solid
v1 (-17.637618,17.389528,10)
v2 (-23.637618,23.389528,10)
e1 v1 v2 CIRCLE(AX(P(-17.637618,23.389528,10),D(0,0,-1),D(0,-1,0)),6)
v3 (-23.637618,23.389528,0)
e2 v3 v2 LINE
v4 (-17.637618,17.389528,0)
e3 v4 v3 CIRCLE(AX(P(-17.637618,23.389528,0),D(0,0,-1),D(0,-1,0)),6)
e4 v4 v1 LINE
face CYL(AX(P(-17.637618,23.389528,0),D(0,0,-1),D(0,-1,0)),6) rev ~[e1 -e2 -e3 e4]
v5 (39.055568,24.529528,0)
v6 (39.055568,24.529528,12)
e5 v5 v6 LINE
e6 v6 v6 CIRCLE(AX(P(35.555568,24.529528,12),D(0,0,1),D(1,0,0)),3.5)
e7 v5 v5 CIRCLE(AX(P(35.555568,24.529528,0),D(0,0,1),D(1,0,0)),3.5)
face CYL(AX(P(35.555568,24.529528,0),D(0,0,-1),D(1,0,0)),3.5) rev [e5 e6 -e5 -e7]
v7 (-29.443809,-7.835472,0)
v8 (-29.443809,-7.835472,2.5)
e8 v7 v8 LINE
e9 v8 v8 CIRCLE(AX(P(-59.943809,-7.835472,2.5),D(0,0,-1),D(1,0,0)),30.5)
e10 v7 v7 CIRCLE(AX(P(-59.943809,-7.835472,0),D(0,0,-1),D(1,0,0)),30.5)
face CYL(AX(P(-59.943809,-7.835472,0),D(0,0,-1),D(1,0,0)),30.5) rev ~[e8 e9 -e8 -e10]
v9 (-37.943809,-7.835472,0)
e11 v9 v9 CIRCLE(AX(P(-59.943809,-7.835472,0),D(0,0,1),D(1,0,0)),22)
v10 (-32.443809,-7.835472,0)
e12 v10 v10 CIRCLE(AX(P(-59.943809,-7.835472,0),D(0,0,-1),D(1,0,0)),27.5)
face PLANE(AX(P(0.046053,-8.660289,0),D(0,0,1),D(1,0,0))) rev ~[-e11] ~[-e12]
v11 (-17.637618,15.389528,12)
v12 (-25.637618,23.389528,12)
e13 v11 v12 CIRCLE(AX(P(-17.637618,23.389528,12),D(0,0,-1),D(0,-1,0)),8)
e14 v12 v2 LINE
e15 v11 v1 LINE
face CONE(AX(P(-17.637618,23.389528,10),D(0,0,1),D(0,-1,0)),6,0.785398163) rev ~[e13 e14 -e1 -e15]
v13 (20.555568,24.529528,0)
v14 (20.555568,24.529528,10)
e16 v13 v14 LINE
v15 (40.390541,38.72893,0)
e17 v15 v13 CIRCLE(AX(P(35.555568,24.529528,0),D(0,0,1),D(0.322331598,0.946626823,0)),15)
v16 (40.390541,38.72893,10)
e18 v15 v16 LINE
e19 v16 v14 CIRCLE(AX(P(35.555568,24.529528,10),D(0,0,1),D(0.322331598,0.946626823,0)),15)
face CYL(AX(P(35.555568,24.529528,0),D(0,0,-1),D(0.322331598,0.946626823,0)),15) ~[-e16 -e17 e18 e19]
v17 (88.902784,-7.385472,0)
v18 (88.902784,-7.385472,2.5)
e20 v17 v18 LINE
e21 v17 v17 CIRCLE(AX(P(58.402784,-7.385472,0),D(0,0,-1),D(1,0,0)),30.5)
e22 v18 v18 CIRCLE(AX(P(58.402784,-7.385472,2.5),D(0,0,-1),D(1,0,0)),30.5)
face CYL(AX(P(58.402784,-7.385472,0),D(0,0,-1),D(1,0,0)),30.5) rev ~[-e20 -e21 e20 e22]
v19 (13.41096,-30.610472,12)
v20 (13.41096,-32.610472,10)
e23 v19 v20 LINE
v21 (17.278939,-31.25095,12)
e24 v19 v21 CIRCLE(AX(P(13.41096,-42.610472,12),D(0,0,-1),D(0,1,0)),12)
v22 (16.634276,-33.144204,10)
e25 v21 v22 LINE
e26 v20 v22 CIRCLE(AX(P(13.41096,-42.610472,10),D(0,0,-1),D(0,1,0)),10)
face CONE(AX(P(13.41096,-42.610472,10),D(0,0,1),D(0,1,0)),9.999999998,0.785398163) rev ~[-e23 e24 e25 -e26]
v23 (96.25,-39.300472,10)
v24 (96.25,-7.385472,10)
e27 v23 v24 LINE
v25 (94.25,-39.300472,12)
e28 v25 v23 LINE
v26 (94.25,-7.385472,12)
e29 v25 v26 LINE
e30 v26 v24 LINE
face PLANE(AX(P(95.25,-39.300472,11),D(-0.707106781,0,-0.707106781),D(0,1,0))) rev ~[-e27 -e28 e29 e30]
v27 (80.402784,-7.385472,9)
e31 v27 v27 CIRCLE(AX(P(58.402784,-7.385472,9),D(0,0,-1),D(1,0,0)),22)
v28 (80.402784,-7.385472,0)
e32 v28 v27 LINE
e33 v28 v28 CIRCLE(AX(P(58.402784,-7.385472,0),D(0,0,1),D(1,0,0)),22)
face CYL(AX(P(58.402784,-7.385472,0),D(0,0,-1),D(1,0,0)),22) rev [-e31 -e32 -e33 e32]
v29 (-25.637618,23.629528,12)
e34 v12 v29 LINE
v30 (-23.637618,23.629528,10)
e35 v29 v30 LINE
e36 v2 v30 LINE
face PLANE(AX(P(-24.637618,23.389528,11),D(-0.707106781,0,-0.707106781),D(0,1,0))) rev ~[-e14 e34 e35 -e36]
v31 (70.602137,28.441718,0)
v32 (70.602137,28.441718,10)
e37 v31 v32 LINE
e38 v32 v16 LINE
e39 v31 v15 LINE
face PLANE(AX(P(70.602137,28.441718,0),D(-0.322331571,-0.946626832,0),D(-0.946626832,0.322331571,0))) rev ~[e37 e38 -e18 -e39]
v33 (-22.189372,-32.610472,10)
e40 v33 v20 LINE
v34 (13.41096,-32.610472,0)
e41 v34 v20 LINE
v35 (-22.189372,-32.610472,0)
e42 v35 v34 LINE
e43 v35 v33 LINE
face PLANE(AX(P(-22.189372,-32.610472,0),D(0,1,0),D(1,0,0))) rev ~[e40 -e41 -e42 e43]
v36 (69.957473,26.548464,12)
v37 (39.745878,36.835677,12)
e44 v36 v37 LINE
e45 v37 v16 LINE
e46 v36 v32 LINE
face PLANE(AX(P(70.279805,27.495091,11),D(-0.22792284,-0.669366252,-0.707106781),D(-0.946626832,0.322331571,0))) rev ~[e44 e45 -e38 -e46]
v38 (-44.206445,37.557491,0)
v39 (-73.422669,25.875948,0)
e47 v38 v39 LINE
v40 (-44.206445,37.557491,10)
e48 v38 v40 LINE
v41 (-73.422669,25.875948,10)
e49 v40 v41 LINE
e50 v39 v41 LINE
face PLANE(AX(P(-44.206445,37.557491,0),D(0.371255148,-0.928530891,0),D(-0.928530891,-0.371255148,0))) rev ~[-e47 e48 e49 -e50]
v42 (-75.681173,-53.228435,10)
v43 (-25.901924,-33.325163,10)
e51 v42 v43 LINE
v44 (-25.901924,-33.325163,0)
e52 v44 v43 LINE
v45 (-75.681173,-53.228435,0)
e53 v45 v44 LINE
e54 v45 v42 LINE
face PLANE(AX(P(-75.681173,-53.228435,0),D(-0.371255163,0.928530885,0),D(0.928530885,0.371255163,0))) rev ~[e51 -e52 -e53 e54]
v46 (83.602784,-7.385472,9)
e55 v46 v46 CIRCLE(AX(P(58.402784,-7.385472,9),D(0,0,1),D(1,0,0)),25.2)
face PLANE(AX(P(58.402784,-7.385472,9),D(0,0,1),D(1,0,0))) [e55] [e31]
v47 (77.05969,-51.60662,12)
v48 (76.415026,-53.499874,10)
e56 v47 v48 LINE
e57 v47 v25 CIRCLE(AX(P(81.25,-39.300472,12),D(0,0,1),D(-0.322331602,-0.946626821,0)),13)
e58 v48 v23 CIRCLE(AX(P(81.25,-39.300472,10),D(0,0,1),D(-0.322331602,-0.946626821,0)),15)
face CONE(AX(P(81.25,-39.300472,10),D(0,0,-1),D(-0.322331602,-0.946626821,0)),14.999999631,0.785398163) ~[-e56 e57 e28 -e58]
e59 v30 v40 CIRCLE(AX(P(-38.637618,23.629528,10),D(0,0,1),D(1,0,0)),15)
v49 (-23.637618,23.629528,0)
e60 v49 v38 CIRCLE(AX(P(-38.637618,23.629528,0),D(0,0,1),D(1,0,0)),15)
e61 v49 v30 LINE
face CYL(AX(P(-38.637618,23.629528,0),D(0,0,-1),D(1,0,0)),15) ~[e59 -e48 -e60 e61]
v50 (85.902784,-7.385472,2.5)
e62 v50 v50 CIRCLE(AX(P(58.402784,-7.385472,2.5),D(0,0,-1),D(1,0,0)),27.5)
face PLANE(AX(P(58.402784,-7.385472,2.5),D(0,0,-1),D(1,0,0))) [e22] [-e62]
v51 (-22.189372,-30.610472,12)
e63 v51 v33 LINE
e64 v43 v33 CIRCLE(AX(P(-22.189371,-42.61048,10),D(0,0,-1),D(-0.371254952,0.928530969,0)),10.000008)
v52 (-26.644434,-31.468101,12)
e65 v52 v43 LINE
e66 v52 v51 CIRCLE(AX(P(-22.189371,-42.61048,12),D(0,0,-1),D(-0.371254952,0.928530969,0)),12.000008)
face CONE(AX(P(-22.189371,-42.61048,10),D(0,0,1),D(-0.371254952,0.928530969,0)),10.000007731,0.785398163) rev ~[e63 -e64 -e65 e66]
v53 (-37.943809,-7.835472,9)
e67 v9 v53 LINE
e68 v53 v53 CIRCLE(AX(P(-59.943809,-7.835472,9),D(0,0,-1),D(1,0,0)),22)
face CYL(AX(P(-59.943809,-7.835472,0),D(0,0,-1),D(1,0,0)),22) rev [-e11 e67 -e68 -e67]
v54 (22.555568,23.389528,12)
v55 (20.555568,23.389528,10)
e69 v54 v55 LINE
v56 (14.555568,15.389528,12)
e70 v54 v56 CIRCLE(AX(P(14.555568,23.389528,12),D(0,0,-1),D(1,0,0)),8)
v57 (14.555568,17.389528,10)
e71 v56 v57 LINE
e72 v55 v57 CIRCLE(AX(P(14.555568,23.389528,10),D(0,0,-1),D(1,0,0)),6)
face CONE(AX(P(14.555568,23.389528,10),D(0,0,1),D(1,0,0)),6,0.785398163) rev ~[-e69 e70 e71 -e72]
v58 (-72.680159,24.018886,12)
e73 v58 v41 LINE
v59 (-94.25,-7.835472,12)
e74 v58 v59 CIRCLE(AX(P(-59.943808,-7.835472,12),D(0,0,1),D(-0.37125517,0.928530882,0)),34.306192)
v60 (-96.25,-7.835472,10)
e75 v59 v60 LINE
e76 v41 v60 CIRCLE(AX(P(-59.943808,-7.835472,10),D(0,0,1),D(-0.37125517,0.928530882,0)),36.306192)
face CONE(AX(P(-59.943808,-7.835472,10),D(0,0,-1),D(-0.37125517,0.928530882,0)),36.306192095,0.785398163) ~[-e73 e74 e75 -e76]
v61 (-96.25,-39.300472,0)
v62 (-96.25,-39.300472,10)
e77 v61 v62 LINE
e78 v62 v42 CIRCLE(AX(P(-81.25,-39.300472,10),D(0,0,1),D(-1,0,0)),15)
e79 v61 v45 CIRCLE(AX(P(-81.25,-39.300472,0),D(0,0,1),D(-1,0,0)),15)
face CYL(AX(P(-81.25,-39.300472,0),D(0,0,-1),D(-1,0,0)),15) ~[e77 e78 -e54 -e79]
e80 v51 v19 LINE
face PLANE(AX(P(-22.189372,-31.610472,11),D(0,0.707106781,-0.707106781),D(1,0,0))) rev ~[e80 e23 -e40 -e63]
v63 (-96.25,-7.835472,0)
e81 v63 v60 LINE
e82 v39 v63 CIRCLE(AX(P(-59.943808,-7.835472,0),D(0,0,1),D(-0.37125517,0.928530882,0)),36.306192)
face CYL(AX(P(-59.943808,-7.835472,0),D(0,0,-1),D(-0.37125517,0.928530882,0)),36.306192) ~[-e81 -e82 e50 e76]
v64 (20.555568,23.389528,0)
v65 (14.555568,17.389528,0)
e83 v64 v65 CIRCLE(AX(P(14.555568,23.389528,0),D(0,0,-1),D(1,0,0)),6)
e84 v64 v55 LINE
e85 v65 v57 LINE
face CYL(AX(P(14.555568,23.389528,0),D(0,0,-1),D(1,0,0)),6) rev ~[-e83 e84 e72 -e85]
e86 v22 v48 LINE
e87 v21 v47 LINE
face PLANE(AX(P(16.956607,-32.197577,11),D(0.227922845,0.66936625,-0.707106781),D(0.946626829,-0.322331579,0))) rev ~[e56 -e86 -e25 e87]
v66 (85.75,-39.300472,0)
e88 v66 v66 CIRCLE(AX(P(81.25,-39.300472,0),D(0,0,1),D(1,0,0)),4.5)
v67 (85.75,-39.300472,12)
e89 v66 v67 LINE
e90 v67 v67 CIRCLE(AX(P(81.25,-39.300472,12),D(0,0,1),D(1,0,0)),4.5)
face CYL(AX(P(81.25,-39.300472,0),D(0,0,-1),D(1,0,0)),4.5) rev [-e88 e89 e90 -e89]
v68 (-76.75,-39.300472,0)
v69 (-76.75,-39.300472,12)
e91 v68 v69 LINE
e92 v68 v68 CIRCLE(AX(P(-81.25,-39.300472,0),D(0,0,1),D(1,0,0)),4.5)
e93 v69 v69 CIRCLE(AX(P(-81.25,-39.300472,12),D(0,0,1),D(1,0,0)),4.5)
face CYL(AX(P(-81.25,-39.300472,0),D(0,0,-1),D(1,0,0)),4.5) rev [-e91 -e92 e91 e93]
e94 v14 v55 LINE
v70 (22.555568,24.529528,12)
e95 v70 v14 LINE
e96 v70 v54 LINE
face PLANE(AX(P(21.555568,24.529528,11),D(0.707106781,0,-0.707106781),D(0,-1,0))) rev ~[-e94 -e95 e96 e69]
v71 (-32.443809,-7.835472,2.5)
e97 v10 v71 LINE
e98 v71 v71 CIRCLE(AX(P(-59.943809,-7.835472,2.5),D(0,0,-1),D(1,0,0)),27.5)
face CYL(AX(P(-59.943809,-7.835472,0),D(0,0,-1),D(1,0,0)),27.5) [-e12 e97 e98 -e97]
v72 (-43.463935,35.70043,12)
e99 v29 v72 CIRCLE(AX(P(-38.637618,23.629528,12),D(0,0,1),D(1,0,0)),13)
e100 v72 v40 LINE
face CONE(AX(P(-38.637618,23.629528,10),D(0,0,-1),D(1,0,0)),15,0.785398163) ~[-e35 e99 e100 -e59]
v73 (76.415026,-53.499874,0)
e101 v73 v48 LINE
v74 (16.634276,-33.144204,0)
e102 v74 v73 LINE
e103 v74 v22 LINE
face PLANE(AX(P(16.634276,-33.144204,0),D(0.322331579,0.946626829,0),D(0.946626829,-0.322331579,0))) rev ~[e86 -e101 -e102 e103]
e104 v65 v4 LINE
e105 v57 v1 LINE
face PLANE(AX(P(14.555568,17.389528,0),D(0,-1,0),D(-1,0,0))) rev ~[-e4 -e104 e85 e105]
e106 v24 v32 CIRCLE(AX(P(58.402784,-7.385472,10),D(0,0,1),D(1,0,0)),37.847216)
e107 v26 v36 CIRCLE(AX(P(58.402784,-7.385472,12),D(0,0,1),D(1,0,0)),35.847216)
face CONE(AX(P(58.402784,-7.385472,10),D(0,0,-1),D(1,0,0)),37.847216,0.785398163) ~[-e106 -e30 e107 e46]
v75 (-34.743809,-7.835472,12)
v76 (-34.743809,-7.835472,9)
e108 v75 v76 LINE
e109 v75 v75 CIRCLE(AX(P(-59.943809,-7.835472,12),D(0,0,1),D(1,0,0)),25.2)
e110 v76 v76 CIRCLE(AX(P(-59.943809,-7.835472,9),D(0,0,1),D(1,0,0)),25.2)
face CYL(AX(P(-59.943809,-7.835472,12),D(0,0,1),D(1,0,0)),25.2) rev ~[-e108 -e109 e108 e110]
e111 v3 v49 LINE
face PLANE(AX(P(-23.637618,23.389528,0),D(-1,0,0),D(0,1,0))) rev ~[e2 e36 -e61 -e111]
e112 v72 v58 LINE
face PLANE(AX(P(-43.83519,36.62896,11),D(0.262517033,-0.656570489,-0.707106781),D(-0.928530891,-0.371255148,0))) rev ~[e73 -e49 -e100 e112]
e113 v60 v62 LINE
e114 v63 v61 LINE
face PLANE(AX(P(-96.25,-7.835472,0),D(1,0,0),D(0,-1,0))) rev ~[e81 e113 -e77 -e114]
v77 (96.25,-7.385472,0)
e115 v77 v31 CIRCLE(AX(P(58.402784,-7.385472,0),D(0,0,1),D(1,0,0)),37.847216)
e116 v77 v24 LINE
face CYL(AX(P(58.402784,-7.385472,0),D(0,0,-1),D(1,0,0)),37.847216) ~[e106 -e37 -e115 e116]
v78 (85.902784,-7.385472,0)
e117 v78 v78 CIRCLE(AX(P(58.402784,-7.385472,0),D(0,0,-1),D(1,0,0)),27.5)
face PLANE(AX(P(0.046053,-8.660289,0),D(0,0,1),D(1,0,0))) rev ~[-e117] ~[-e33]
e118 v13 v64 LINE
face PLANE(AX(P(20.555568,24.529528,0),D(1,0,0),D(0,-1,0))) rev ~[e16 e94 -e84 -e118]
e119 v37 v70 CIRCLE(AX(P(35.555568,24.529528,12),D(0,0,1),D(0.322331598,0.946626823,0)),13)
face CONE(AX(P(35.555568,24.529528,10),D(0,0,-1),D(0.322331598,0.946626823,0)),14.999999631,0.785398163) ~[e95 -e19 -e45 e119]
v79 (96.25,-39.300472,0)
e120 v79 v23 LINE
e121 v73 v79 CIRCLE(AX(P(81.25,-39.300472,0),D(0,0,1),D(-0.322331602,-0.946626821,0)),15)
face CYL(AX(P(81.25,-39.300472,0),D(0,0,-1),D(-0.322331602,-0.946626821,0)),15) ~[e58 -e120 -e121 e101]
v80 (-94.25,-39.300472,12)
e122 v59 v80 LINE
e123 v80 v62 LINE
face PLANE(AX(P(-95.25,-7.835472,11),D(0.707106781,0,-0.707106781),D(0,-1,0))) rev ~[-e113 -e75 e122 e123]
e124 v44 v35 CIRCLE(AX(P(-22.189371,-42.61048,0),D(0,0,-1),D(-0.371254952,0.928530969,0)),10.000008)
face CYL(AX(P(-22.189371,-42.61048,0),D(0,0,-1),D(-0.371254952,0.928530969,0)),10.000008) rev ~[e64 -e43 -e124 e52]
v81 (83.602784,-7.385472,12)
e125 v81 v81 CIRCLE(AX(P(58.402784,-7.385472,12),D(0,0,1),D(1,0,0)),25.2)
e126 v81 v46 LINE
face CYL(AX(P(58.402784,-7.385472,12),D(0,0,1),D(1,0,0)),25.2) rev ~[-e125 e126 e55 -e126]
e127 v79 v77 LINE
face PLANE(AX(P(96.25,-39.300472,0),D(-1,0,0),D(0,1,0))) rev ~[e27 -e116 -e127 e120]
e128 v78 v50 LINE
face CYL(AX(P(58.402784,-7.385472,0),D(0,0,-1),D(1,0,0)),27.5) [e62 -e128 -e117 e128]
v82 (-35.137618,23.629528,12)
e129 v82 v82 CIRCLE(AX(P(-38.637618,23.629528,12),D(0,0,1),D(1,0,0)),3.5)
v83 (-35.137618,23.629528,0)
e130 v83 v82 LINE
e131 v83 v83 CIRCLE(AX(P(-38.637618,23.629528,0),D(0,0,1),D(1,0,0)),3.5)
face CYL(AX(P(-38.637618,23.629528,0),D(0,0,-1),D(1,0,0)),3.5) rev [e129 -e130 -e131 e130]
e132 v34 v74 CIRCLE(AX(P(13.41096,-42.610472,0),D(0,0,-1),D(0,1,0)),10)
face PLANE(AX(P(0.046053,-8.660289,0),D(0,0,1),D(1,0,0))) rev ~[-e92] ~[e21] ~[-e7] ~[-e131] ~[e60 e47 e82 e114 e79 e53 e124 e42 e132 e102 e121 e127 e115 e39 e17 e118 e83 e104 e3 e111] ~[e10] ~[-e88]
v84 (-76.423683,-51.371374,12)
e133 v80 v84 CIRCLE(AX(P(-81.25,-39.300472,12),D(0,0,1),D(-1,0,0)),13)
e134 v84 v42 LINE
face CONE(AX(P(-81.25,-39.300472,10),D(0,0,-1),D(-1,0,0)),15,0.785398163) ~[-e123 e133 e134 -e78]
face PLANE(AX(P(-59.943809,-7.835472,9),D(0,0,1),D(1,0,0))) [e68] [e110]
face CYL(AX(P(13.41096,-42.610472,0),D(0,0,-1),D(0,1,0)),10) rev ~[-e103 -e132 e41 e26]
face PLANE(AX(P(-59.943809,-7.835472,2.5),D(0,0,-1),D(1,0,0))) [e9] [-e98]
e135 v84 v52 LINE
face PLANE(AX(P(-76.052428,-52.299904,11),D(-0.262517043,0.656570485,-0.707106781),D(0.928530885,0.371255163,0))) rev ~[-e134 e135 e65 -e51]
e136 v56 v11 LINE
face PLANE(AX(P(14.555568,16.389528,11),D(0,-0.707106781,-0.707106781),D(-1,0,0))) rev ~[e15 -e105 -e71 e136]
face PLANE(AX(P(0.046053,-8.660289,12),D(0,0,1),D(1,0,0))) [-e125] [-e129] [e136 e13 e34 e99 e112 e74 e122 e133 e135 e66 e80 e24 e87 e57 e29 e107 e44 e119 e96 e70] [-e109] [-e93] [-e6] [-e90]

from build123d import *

# Parameters (mm, degrees)
F0_R     = 4.5
F0_R_2   = 22
F0_R_3   = 3.5
F1_DEPTH = 12
F2_R     = 25.2
F3_DEPTH = 3
F4_SIZE  = 2
F5_R     = 30.5
F5_R_2   = 27.5
F6_DEPTH = 2.5


# Not quite as in the source:
# - ends of sketch curves that miss each other by under 0.0002 mm in the source are joined


with BuildPart() as f1:
    # F0 (on Top) → F1 (new body)
    with BuildSketch(Plane.XY):
        with BuildLine():
            Line((-96.25, -7.835472), (-96.25, -39.300472))
            ThreePointArc((-96.25, -39.300472), (-89.6603385796, -51.720866719), (-75.6811726698, -53.2284353172))
            Line((-75.6811726698, -53.2284353172), (-25.901923657, -33.3251628629))
            ThreePointArc((-25.901923657, -33.3251628629), (-24.0797305928, -32.7907701516), (-22.189372, -32.610472))
            Line((-22.189372, -32.610472), (13.41096, -32.610472))
            ThreePointArc((13.41096, -32.610472), (15.0445629213, -32.7448072228), (16.6342757601, -33.1442037009))
            Line((16.6342757601, -33.1442037009), (76.4150264593, -53.4998741564))
            ThreePointArc((76.4150264593, -53.4998741564), (89.9814201421, -51.4972872524), (96.25, -39.300472))
            Line((96.25, -39.300472), (96.25, -7.385472))
            ThreePointArc((96.25, -7.385472), (89.1771507076, 14.6451910108), (70.602136617, 28.4417181588))
            Line((70.602136617, 28.4417181588), (40.3905414757, 38.7289301785))
            ThreePointArc((40.3905414757, 38.7289301785), (26.82414783, 36.7263432324), (20.555568, 24.529528))
            Line((20.555568, 24.529528), (20.555568, 23.389528))
            ThreePointArc((20.555568, 23.389528), (18.7982086871, 19.1468873129), (14.555568, 17.389528))
            Line((14.555568, 17.389528), (-17.637618, 17.389528))
            ThreePointArc((-17.637618, 17.389528), (-21.8802586871, 19.1468873129), (-23.637618, 23.389528))
            Line((-23.637618, 23.389528), (-23.637618, 23.629528))
            ThreePointArc((-23.637618, 23.629528), (-30.2272793638, 36.0499226807), (-44.2064452032, 37.557491368))
            Line((-44.2064452032, 37.557491368), (-73.4226694122, 25.875948235))
            ThreePointArc((-73.4226694122, 25.875948235), (-90.0062904382, 12.5210187268), (-96.25, -7.835472))
        make_face()
        with Locations((-81.25, -39.300472)):
            Circle(F0_R, mode=Mode.SUBTRACT)
        with Locations((-59.943809, -7.835472)):
            Circle(F0_R_2, mode=Mode.SUBTRACT)
        with Locations((81.25, -39.300472)):
            Circle(F0_R, mode=Mode.SUBTRACT)
        with Locations((-38.637618, 23.629528)):
            Circle(F0_R_3, mode=Mode.SUBTRACT)
        with Locations((58.402784, -7.385472)):
            Circle(F0_R_2, mode=Mode.SUBTRACT)
        with Locations((35.555568, 24.529528)):
            Circle(F0_R_3, mode=Mode.SUBTRACT)
    extrude(amount=F1_DEPTH)

    # F2 (on face) → F3 (cut)
    with BuildSketch(Plane.XY.offset(12)):
        with Locations((-59.943809, -7.835472)):
            Circle(F2_R)
        with Locations((58.402784, -7.385472)):
            Circle(F2_R)
    extrude(amount=-F3_DEPTH, mode=Mode.SUBTRACT)

    # F4
    f4_edges = [f1.edges().sort_by_distance(p)[0] for p in [
        (-58.814557, 31.71672, 12),
    ]]
    chamfer(f4_edges, length=F4_SIZE)

    # F5 (on face) → F6 (cut)
    with BuildSketch(Plane(origin=(0, 0, 0), x_dir=(1, 0, 0), z_dir=(0, 0, -1))):
        with Locations((-59.943809, 7.835472)):
            Circle(F5_R)
        with Locations((-59.943809, 7.835472)):
            Circle(F5_R_2, mode=Mode.SUBTRACT)
        with Locations((58.402784, 7.385472)):
            Circle(F5_R)
        with Locations((58.402784, 7.385472)):
            Circle(F5_R_2, mode=Mode.SUBTRACT)
    extrude(amount=-F6_DEPTH, mode=Mode.SUBTRACT)


solid = f1.part
